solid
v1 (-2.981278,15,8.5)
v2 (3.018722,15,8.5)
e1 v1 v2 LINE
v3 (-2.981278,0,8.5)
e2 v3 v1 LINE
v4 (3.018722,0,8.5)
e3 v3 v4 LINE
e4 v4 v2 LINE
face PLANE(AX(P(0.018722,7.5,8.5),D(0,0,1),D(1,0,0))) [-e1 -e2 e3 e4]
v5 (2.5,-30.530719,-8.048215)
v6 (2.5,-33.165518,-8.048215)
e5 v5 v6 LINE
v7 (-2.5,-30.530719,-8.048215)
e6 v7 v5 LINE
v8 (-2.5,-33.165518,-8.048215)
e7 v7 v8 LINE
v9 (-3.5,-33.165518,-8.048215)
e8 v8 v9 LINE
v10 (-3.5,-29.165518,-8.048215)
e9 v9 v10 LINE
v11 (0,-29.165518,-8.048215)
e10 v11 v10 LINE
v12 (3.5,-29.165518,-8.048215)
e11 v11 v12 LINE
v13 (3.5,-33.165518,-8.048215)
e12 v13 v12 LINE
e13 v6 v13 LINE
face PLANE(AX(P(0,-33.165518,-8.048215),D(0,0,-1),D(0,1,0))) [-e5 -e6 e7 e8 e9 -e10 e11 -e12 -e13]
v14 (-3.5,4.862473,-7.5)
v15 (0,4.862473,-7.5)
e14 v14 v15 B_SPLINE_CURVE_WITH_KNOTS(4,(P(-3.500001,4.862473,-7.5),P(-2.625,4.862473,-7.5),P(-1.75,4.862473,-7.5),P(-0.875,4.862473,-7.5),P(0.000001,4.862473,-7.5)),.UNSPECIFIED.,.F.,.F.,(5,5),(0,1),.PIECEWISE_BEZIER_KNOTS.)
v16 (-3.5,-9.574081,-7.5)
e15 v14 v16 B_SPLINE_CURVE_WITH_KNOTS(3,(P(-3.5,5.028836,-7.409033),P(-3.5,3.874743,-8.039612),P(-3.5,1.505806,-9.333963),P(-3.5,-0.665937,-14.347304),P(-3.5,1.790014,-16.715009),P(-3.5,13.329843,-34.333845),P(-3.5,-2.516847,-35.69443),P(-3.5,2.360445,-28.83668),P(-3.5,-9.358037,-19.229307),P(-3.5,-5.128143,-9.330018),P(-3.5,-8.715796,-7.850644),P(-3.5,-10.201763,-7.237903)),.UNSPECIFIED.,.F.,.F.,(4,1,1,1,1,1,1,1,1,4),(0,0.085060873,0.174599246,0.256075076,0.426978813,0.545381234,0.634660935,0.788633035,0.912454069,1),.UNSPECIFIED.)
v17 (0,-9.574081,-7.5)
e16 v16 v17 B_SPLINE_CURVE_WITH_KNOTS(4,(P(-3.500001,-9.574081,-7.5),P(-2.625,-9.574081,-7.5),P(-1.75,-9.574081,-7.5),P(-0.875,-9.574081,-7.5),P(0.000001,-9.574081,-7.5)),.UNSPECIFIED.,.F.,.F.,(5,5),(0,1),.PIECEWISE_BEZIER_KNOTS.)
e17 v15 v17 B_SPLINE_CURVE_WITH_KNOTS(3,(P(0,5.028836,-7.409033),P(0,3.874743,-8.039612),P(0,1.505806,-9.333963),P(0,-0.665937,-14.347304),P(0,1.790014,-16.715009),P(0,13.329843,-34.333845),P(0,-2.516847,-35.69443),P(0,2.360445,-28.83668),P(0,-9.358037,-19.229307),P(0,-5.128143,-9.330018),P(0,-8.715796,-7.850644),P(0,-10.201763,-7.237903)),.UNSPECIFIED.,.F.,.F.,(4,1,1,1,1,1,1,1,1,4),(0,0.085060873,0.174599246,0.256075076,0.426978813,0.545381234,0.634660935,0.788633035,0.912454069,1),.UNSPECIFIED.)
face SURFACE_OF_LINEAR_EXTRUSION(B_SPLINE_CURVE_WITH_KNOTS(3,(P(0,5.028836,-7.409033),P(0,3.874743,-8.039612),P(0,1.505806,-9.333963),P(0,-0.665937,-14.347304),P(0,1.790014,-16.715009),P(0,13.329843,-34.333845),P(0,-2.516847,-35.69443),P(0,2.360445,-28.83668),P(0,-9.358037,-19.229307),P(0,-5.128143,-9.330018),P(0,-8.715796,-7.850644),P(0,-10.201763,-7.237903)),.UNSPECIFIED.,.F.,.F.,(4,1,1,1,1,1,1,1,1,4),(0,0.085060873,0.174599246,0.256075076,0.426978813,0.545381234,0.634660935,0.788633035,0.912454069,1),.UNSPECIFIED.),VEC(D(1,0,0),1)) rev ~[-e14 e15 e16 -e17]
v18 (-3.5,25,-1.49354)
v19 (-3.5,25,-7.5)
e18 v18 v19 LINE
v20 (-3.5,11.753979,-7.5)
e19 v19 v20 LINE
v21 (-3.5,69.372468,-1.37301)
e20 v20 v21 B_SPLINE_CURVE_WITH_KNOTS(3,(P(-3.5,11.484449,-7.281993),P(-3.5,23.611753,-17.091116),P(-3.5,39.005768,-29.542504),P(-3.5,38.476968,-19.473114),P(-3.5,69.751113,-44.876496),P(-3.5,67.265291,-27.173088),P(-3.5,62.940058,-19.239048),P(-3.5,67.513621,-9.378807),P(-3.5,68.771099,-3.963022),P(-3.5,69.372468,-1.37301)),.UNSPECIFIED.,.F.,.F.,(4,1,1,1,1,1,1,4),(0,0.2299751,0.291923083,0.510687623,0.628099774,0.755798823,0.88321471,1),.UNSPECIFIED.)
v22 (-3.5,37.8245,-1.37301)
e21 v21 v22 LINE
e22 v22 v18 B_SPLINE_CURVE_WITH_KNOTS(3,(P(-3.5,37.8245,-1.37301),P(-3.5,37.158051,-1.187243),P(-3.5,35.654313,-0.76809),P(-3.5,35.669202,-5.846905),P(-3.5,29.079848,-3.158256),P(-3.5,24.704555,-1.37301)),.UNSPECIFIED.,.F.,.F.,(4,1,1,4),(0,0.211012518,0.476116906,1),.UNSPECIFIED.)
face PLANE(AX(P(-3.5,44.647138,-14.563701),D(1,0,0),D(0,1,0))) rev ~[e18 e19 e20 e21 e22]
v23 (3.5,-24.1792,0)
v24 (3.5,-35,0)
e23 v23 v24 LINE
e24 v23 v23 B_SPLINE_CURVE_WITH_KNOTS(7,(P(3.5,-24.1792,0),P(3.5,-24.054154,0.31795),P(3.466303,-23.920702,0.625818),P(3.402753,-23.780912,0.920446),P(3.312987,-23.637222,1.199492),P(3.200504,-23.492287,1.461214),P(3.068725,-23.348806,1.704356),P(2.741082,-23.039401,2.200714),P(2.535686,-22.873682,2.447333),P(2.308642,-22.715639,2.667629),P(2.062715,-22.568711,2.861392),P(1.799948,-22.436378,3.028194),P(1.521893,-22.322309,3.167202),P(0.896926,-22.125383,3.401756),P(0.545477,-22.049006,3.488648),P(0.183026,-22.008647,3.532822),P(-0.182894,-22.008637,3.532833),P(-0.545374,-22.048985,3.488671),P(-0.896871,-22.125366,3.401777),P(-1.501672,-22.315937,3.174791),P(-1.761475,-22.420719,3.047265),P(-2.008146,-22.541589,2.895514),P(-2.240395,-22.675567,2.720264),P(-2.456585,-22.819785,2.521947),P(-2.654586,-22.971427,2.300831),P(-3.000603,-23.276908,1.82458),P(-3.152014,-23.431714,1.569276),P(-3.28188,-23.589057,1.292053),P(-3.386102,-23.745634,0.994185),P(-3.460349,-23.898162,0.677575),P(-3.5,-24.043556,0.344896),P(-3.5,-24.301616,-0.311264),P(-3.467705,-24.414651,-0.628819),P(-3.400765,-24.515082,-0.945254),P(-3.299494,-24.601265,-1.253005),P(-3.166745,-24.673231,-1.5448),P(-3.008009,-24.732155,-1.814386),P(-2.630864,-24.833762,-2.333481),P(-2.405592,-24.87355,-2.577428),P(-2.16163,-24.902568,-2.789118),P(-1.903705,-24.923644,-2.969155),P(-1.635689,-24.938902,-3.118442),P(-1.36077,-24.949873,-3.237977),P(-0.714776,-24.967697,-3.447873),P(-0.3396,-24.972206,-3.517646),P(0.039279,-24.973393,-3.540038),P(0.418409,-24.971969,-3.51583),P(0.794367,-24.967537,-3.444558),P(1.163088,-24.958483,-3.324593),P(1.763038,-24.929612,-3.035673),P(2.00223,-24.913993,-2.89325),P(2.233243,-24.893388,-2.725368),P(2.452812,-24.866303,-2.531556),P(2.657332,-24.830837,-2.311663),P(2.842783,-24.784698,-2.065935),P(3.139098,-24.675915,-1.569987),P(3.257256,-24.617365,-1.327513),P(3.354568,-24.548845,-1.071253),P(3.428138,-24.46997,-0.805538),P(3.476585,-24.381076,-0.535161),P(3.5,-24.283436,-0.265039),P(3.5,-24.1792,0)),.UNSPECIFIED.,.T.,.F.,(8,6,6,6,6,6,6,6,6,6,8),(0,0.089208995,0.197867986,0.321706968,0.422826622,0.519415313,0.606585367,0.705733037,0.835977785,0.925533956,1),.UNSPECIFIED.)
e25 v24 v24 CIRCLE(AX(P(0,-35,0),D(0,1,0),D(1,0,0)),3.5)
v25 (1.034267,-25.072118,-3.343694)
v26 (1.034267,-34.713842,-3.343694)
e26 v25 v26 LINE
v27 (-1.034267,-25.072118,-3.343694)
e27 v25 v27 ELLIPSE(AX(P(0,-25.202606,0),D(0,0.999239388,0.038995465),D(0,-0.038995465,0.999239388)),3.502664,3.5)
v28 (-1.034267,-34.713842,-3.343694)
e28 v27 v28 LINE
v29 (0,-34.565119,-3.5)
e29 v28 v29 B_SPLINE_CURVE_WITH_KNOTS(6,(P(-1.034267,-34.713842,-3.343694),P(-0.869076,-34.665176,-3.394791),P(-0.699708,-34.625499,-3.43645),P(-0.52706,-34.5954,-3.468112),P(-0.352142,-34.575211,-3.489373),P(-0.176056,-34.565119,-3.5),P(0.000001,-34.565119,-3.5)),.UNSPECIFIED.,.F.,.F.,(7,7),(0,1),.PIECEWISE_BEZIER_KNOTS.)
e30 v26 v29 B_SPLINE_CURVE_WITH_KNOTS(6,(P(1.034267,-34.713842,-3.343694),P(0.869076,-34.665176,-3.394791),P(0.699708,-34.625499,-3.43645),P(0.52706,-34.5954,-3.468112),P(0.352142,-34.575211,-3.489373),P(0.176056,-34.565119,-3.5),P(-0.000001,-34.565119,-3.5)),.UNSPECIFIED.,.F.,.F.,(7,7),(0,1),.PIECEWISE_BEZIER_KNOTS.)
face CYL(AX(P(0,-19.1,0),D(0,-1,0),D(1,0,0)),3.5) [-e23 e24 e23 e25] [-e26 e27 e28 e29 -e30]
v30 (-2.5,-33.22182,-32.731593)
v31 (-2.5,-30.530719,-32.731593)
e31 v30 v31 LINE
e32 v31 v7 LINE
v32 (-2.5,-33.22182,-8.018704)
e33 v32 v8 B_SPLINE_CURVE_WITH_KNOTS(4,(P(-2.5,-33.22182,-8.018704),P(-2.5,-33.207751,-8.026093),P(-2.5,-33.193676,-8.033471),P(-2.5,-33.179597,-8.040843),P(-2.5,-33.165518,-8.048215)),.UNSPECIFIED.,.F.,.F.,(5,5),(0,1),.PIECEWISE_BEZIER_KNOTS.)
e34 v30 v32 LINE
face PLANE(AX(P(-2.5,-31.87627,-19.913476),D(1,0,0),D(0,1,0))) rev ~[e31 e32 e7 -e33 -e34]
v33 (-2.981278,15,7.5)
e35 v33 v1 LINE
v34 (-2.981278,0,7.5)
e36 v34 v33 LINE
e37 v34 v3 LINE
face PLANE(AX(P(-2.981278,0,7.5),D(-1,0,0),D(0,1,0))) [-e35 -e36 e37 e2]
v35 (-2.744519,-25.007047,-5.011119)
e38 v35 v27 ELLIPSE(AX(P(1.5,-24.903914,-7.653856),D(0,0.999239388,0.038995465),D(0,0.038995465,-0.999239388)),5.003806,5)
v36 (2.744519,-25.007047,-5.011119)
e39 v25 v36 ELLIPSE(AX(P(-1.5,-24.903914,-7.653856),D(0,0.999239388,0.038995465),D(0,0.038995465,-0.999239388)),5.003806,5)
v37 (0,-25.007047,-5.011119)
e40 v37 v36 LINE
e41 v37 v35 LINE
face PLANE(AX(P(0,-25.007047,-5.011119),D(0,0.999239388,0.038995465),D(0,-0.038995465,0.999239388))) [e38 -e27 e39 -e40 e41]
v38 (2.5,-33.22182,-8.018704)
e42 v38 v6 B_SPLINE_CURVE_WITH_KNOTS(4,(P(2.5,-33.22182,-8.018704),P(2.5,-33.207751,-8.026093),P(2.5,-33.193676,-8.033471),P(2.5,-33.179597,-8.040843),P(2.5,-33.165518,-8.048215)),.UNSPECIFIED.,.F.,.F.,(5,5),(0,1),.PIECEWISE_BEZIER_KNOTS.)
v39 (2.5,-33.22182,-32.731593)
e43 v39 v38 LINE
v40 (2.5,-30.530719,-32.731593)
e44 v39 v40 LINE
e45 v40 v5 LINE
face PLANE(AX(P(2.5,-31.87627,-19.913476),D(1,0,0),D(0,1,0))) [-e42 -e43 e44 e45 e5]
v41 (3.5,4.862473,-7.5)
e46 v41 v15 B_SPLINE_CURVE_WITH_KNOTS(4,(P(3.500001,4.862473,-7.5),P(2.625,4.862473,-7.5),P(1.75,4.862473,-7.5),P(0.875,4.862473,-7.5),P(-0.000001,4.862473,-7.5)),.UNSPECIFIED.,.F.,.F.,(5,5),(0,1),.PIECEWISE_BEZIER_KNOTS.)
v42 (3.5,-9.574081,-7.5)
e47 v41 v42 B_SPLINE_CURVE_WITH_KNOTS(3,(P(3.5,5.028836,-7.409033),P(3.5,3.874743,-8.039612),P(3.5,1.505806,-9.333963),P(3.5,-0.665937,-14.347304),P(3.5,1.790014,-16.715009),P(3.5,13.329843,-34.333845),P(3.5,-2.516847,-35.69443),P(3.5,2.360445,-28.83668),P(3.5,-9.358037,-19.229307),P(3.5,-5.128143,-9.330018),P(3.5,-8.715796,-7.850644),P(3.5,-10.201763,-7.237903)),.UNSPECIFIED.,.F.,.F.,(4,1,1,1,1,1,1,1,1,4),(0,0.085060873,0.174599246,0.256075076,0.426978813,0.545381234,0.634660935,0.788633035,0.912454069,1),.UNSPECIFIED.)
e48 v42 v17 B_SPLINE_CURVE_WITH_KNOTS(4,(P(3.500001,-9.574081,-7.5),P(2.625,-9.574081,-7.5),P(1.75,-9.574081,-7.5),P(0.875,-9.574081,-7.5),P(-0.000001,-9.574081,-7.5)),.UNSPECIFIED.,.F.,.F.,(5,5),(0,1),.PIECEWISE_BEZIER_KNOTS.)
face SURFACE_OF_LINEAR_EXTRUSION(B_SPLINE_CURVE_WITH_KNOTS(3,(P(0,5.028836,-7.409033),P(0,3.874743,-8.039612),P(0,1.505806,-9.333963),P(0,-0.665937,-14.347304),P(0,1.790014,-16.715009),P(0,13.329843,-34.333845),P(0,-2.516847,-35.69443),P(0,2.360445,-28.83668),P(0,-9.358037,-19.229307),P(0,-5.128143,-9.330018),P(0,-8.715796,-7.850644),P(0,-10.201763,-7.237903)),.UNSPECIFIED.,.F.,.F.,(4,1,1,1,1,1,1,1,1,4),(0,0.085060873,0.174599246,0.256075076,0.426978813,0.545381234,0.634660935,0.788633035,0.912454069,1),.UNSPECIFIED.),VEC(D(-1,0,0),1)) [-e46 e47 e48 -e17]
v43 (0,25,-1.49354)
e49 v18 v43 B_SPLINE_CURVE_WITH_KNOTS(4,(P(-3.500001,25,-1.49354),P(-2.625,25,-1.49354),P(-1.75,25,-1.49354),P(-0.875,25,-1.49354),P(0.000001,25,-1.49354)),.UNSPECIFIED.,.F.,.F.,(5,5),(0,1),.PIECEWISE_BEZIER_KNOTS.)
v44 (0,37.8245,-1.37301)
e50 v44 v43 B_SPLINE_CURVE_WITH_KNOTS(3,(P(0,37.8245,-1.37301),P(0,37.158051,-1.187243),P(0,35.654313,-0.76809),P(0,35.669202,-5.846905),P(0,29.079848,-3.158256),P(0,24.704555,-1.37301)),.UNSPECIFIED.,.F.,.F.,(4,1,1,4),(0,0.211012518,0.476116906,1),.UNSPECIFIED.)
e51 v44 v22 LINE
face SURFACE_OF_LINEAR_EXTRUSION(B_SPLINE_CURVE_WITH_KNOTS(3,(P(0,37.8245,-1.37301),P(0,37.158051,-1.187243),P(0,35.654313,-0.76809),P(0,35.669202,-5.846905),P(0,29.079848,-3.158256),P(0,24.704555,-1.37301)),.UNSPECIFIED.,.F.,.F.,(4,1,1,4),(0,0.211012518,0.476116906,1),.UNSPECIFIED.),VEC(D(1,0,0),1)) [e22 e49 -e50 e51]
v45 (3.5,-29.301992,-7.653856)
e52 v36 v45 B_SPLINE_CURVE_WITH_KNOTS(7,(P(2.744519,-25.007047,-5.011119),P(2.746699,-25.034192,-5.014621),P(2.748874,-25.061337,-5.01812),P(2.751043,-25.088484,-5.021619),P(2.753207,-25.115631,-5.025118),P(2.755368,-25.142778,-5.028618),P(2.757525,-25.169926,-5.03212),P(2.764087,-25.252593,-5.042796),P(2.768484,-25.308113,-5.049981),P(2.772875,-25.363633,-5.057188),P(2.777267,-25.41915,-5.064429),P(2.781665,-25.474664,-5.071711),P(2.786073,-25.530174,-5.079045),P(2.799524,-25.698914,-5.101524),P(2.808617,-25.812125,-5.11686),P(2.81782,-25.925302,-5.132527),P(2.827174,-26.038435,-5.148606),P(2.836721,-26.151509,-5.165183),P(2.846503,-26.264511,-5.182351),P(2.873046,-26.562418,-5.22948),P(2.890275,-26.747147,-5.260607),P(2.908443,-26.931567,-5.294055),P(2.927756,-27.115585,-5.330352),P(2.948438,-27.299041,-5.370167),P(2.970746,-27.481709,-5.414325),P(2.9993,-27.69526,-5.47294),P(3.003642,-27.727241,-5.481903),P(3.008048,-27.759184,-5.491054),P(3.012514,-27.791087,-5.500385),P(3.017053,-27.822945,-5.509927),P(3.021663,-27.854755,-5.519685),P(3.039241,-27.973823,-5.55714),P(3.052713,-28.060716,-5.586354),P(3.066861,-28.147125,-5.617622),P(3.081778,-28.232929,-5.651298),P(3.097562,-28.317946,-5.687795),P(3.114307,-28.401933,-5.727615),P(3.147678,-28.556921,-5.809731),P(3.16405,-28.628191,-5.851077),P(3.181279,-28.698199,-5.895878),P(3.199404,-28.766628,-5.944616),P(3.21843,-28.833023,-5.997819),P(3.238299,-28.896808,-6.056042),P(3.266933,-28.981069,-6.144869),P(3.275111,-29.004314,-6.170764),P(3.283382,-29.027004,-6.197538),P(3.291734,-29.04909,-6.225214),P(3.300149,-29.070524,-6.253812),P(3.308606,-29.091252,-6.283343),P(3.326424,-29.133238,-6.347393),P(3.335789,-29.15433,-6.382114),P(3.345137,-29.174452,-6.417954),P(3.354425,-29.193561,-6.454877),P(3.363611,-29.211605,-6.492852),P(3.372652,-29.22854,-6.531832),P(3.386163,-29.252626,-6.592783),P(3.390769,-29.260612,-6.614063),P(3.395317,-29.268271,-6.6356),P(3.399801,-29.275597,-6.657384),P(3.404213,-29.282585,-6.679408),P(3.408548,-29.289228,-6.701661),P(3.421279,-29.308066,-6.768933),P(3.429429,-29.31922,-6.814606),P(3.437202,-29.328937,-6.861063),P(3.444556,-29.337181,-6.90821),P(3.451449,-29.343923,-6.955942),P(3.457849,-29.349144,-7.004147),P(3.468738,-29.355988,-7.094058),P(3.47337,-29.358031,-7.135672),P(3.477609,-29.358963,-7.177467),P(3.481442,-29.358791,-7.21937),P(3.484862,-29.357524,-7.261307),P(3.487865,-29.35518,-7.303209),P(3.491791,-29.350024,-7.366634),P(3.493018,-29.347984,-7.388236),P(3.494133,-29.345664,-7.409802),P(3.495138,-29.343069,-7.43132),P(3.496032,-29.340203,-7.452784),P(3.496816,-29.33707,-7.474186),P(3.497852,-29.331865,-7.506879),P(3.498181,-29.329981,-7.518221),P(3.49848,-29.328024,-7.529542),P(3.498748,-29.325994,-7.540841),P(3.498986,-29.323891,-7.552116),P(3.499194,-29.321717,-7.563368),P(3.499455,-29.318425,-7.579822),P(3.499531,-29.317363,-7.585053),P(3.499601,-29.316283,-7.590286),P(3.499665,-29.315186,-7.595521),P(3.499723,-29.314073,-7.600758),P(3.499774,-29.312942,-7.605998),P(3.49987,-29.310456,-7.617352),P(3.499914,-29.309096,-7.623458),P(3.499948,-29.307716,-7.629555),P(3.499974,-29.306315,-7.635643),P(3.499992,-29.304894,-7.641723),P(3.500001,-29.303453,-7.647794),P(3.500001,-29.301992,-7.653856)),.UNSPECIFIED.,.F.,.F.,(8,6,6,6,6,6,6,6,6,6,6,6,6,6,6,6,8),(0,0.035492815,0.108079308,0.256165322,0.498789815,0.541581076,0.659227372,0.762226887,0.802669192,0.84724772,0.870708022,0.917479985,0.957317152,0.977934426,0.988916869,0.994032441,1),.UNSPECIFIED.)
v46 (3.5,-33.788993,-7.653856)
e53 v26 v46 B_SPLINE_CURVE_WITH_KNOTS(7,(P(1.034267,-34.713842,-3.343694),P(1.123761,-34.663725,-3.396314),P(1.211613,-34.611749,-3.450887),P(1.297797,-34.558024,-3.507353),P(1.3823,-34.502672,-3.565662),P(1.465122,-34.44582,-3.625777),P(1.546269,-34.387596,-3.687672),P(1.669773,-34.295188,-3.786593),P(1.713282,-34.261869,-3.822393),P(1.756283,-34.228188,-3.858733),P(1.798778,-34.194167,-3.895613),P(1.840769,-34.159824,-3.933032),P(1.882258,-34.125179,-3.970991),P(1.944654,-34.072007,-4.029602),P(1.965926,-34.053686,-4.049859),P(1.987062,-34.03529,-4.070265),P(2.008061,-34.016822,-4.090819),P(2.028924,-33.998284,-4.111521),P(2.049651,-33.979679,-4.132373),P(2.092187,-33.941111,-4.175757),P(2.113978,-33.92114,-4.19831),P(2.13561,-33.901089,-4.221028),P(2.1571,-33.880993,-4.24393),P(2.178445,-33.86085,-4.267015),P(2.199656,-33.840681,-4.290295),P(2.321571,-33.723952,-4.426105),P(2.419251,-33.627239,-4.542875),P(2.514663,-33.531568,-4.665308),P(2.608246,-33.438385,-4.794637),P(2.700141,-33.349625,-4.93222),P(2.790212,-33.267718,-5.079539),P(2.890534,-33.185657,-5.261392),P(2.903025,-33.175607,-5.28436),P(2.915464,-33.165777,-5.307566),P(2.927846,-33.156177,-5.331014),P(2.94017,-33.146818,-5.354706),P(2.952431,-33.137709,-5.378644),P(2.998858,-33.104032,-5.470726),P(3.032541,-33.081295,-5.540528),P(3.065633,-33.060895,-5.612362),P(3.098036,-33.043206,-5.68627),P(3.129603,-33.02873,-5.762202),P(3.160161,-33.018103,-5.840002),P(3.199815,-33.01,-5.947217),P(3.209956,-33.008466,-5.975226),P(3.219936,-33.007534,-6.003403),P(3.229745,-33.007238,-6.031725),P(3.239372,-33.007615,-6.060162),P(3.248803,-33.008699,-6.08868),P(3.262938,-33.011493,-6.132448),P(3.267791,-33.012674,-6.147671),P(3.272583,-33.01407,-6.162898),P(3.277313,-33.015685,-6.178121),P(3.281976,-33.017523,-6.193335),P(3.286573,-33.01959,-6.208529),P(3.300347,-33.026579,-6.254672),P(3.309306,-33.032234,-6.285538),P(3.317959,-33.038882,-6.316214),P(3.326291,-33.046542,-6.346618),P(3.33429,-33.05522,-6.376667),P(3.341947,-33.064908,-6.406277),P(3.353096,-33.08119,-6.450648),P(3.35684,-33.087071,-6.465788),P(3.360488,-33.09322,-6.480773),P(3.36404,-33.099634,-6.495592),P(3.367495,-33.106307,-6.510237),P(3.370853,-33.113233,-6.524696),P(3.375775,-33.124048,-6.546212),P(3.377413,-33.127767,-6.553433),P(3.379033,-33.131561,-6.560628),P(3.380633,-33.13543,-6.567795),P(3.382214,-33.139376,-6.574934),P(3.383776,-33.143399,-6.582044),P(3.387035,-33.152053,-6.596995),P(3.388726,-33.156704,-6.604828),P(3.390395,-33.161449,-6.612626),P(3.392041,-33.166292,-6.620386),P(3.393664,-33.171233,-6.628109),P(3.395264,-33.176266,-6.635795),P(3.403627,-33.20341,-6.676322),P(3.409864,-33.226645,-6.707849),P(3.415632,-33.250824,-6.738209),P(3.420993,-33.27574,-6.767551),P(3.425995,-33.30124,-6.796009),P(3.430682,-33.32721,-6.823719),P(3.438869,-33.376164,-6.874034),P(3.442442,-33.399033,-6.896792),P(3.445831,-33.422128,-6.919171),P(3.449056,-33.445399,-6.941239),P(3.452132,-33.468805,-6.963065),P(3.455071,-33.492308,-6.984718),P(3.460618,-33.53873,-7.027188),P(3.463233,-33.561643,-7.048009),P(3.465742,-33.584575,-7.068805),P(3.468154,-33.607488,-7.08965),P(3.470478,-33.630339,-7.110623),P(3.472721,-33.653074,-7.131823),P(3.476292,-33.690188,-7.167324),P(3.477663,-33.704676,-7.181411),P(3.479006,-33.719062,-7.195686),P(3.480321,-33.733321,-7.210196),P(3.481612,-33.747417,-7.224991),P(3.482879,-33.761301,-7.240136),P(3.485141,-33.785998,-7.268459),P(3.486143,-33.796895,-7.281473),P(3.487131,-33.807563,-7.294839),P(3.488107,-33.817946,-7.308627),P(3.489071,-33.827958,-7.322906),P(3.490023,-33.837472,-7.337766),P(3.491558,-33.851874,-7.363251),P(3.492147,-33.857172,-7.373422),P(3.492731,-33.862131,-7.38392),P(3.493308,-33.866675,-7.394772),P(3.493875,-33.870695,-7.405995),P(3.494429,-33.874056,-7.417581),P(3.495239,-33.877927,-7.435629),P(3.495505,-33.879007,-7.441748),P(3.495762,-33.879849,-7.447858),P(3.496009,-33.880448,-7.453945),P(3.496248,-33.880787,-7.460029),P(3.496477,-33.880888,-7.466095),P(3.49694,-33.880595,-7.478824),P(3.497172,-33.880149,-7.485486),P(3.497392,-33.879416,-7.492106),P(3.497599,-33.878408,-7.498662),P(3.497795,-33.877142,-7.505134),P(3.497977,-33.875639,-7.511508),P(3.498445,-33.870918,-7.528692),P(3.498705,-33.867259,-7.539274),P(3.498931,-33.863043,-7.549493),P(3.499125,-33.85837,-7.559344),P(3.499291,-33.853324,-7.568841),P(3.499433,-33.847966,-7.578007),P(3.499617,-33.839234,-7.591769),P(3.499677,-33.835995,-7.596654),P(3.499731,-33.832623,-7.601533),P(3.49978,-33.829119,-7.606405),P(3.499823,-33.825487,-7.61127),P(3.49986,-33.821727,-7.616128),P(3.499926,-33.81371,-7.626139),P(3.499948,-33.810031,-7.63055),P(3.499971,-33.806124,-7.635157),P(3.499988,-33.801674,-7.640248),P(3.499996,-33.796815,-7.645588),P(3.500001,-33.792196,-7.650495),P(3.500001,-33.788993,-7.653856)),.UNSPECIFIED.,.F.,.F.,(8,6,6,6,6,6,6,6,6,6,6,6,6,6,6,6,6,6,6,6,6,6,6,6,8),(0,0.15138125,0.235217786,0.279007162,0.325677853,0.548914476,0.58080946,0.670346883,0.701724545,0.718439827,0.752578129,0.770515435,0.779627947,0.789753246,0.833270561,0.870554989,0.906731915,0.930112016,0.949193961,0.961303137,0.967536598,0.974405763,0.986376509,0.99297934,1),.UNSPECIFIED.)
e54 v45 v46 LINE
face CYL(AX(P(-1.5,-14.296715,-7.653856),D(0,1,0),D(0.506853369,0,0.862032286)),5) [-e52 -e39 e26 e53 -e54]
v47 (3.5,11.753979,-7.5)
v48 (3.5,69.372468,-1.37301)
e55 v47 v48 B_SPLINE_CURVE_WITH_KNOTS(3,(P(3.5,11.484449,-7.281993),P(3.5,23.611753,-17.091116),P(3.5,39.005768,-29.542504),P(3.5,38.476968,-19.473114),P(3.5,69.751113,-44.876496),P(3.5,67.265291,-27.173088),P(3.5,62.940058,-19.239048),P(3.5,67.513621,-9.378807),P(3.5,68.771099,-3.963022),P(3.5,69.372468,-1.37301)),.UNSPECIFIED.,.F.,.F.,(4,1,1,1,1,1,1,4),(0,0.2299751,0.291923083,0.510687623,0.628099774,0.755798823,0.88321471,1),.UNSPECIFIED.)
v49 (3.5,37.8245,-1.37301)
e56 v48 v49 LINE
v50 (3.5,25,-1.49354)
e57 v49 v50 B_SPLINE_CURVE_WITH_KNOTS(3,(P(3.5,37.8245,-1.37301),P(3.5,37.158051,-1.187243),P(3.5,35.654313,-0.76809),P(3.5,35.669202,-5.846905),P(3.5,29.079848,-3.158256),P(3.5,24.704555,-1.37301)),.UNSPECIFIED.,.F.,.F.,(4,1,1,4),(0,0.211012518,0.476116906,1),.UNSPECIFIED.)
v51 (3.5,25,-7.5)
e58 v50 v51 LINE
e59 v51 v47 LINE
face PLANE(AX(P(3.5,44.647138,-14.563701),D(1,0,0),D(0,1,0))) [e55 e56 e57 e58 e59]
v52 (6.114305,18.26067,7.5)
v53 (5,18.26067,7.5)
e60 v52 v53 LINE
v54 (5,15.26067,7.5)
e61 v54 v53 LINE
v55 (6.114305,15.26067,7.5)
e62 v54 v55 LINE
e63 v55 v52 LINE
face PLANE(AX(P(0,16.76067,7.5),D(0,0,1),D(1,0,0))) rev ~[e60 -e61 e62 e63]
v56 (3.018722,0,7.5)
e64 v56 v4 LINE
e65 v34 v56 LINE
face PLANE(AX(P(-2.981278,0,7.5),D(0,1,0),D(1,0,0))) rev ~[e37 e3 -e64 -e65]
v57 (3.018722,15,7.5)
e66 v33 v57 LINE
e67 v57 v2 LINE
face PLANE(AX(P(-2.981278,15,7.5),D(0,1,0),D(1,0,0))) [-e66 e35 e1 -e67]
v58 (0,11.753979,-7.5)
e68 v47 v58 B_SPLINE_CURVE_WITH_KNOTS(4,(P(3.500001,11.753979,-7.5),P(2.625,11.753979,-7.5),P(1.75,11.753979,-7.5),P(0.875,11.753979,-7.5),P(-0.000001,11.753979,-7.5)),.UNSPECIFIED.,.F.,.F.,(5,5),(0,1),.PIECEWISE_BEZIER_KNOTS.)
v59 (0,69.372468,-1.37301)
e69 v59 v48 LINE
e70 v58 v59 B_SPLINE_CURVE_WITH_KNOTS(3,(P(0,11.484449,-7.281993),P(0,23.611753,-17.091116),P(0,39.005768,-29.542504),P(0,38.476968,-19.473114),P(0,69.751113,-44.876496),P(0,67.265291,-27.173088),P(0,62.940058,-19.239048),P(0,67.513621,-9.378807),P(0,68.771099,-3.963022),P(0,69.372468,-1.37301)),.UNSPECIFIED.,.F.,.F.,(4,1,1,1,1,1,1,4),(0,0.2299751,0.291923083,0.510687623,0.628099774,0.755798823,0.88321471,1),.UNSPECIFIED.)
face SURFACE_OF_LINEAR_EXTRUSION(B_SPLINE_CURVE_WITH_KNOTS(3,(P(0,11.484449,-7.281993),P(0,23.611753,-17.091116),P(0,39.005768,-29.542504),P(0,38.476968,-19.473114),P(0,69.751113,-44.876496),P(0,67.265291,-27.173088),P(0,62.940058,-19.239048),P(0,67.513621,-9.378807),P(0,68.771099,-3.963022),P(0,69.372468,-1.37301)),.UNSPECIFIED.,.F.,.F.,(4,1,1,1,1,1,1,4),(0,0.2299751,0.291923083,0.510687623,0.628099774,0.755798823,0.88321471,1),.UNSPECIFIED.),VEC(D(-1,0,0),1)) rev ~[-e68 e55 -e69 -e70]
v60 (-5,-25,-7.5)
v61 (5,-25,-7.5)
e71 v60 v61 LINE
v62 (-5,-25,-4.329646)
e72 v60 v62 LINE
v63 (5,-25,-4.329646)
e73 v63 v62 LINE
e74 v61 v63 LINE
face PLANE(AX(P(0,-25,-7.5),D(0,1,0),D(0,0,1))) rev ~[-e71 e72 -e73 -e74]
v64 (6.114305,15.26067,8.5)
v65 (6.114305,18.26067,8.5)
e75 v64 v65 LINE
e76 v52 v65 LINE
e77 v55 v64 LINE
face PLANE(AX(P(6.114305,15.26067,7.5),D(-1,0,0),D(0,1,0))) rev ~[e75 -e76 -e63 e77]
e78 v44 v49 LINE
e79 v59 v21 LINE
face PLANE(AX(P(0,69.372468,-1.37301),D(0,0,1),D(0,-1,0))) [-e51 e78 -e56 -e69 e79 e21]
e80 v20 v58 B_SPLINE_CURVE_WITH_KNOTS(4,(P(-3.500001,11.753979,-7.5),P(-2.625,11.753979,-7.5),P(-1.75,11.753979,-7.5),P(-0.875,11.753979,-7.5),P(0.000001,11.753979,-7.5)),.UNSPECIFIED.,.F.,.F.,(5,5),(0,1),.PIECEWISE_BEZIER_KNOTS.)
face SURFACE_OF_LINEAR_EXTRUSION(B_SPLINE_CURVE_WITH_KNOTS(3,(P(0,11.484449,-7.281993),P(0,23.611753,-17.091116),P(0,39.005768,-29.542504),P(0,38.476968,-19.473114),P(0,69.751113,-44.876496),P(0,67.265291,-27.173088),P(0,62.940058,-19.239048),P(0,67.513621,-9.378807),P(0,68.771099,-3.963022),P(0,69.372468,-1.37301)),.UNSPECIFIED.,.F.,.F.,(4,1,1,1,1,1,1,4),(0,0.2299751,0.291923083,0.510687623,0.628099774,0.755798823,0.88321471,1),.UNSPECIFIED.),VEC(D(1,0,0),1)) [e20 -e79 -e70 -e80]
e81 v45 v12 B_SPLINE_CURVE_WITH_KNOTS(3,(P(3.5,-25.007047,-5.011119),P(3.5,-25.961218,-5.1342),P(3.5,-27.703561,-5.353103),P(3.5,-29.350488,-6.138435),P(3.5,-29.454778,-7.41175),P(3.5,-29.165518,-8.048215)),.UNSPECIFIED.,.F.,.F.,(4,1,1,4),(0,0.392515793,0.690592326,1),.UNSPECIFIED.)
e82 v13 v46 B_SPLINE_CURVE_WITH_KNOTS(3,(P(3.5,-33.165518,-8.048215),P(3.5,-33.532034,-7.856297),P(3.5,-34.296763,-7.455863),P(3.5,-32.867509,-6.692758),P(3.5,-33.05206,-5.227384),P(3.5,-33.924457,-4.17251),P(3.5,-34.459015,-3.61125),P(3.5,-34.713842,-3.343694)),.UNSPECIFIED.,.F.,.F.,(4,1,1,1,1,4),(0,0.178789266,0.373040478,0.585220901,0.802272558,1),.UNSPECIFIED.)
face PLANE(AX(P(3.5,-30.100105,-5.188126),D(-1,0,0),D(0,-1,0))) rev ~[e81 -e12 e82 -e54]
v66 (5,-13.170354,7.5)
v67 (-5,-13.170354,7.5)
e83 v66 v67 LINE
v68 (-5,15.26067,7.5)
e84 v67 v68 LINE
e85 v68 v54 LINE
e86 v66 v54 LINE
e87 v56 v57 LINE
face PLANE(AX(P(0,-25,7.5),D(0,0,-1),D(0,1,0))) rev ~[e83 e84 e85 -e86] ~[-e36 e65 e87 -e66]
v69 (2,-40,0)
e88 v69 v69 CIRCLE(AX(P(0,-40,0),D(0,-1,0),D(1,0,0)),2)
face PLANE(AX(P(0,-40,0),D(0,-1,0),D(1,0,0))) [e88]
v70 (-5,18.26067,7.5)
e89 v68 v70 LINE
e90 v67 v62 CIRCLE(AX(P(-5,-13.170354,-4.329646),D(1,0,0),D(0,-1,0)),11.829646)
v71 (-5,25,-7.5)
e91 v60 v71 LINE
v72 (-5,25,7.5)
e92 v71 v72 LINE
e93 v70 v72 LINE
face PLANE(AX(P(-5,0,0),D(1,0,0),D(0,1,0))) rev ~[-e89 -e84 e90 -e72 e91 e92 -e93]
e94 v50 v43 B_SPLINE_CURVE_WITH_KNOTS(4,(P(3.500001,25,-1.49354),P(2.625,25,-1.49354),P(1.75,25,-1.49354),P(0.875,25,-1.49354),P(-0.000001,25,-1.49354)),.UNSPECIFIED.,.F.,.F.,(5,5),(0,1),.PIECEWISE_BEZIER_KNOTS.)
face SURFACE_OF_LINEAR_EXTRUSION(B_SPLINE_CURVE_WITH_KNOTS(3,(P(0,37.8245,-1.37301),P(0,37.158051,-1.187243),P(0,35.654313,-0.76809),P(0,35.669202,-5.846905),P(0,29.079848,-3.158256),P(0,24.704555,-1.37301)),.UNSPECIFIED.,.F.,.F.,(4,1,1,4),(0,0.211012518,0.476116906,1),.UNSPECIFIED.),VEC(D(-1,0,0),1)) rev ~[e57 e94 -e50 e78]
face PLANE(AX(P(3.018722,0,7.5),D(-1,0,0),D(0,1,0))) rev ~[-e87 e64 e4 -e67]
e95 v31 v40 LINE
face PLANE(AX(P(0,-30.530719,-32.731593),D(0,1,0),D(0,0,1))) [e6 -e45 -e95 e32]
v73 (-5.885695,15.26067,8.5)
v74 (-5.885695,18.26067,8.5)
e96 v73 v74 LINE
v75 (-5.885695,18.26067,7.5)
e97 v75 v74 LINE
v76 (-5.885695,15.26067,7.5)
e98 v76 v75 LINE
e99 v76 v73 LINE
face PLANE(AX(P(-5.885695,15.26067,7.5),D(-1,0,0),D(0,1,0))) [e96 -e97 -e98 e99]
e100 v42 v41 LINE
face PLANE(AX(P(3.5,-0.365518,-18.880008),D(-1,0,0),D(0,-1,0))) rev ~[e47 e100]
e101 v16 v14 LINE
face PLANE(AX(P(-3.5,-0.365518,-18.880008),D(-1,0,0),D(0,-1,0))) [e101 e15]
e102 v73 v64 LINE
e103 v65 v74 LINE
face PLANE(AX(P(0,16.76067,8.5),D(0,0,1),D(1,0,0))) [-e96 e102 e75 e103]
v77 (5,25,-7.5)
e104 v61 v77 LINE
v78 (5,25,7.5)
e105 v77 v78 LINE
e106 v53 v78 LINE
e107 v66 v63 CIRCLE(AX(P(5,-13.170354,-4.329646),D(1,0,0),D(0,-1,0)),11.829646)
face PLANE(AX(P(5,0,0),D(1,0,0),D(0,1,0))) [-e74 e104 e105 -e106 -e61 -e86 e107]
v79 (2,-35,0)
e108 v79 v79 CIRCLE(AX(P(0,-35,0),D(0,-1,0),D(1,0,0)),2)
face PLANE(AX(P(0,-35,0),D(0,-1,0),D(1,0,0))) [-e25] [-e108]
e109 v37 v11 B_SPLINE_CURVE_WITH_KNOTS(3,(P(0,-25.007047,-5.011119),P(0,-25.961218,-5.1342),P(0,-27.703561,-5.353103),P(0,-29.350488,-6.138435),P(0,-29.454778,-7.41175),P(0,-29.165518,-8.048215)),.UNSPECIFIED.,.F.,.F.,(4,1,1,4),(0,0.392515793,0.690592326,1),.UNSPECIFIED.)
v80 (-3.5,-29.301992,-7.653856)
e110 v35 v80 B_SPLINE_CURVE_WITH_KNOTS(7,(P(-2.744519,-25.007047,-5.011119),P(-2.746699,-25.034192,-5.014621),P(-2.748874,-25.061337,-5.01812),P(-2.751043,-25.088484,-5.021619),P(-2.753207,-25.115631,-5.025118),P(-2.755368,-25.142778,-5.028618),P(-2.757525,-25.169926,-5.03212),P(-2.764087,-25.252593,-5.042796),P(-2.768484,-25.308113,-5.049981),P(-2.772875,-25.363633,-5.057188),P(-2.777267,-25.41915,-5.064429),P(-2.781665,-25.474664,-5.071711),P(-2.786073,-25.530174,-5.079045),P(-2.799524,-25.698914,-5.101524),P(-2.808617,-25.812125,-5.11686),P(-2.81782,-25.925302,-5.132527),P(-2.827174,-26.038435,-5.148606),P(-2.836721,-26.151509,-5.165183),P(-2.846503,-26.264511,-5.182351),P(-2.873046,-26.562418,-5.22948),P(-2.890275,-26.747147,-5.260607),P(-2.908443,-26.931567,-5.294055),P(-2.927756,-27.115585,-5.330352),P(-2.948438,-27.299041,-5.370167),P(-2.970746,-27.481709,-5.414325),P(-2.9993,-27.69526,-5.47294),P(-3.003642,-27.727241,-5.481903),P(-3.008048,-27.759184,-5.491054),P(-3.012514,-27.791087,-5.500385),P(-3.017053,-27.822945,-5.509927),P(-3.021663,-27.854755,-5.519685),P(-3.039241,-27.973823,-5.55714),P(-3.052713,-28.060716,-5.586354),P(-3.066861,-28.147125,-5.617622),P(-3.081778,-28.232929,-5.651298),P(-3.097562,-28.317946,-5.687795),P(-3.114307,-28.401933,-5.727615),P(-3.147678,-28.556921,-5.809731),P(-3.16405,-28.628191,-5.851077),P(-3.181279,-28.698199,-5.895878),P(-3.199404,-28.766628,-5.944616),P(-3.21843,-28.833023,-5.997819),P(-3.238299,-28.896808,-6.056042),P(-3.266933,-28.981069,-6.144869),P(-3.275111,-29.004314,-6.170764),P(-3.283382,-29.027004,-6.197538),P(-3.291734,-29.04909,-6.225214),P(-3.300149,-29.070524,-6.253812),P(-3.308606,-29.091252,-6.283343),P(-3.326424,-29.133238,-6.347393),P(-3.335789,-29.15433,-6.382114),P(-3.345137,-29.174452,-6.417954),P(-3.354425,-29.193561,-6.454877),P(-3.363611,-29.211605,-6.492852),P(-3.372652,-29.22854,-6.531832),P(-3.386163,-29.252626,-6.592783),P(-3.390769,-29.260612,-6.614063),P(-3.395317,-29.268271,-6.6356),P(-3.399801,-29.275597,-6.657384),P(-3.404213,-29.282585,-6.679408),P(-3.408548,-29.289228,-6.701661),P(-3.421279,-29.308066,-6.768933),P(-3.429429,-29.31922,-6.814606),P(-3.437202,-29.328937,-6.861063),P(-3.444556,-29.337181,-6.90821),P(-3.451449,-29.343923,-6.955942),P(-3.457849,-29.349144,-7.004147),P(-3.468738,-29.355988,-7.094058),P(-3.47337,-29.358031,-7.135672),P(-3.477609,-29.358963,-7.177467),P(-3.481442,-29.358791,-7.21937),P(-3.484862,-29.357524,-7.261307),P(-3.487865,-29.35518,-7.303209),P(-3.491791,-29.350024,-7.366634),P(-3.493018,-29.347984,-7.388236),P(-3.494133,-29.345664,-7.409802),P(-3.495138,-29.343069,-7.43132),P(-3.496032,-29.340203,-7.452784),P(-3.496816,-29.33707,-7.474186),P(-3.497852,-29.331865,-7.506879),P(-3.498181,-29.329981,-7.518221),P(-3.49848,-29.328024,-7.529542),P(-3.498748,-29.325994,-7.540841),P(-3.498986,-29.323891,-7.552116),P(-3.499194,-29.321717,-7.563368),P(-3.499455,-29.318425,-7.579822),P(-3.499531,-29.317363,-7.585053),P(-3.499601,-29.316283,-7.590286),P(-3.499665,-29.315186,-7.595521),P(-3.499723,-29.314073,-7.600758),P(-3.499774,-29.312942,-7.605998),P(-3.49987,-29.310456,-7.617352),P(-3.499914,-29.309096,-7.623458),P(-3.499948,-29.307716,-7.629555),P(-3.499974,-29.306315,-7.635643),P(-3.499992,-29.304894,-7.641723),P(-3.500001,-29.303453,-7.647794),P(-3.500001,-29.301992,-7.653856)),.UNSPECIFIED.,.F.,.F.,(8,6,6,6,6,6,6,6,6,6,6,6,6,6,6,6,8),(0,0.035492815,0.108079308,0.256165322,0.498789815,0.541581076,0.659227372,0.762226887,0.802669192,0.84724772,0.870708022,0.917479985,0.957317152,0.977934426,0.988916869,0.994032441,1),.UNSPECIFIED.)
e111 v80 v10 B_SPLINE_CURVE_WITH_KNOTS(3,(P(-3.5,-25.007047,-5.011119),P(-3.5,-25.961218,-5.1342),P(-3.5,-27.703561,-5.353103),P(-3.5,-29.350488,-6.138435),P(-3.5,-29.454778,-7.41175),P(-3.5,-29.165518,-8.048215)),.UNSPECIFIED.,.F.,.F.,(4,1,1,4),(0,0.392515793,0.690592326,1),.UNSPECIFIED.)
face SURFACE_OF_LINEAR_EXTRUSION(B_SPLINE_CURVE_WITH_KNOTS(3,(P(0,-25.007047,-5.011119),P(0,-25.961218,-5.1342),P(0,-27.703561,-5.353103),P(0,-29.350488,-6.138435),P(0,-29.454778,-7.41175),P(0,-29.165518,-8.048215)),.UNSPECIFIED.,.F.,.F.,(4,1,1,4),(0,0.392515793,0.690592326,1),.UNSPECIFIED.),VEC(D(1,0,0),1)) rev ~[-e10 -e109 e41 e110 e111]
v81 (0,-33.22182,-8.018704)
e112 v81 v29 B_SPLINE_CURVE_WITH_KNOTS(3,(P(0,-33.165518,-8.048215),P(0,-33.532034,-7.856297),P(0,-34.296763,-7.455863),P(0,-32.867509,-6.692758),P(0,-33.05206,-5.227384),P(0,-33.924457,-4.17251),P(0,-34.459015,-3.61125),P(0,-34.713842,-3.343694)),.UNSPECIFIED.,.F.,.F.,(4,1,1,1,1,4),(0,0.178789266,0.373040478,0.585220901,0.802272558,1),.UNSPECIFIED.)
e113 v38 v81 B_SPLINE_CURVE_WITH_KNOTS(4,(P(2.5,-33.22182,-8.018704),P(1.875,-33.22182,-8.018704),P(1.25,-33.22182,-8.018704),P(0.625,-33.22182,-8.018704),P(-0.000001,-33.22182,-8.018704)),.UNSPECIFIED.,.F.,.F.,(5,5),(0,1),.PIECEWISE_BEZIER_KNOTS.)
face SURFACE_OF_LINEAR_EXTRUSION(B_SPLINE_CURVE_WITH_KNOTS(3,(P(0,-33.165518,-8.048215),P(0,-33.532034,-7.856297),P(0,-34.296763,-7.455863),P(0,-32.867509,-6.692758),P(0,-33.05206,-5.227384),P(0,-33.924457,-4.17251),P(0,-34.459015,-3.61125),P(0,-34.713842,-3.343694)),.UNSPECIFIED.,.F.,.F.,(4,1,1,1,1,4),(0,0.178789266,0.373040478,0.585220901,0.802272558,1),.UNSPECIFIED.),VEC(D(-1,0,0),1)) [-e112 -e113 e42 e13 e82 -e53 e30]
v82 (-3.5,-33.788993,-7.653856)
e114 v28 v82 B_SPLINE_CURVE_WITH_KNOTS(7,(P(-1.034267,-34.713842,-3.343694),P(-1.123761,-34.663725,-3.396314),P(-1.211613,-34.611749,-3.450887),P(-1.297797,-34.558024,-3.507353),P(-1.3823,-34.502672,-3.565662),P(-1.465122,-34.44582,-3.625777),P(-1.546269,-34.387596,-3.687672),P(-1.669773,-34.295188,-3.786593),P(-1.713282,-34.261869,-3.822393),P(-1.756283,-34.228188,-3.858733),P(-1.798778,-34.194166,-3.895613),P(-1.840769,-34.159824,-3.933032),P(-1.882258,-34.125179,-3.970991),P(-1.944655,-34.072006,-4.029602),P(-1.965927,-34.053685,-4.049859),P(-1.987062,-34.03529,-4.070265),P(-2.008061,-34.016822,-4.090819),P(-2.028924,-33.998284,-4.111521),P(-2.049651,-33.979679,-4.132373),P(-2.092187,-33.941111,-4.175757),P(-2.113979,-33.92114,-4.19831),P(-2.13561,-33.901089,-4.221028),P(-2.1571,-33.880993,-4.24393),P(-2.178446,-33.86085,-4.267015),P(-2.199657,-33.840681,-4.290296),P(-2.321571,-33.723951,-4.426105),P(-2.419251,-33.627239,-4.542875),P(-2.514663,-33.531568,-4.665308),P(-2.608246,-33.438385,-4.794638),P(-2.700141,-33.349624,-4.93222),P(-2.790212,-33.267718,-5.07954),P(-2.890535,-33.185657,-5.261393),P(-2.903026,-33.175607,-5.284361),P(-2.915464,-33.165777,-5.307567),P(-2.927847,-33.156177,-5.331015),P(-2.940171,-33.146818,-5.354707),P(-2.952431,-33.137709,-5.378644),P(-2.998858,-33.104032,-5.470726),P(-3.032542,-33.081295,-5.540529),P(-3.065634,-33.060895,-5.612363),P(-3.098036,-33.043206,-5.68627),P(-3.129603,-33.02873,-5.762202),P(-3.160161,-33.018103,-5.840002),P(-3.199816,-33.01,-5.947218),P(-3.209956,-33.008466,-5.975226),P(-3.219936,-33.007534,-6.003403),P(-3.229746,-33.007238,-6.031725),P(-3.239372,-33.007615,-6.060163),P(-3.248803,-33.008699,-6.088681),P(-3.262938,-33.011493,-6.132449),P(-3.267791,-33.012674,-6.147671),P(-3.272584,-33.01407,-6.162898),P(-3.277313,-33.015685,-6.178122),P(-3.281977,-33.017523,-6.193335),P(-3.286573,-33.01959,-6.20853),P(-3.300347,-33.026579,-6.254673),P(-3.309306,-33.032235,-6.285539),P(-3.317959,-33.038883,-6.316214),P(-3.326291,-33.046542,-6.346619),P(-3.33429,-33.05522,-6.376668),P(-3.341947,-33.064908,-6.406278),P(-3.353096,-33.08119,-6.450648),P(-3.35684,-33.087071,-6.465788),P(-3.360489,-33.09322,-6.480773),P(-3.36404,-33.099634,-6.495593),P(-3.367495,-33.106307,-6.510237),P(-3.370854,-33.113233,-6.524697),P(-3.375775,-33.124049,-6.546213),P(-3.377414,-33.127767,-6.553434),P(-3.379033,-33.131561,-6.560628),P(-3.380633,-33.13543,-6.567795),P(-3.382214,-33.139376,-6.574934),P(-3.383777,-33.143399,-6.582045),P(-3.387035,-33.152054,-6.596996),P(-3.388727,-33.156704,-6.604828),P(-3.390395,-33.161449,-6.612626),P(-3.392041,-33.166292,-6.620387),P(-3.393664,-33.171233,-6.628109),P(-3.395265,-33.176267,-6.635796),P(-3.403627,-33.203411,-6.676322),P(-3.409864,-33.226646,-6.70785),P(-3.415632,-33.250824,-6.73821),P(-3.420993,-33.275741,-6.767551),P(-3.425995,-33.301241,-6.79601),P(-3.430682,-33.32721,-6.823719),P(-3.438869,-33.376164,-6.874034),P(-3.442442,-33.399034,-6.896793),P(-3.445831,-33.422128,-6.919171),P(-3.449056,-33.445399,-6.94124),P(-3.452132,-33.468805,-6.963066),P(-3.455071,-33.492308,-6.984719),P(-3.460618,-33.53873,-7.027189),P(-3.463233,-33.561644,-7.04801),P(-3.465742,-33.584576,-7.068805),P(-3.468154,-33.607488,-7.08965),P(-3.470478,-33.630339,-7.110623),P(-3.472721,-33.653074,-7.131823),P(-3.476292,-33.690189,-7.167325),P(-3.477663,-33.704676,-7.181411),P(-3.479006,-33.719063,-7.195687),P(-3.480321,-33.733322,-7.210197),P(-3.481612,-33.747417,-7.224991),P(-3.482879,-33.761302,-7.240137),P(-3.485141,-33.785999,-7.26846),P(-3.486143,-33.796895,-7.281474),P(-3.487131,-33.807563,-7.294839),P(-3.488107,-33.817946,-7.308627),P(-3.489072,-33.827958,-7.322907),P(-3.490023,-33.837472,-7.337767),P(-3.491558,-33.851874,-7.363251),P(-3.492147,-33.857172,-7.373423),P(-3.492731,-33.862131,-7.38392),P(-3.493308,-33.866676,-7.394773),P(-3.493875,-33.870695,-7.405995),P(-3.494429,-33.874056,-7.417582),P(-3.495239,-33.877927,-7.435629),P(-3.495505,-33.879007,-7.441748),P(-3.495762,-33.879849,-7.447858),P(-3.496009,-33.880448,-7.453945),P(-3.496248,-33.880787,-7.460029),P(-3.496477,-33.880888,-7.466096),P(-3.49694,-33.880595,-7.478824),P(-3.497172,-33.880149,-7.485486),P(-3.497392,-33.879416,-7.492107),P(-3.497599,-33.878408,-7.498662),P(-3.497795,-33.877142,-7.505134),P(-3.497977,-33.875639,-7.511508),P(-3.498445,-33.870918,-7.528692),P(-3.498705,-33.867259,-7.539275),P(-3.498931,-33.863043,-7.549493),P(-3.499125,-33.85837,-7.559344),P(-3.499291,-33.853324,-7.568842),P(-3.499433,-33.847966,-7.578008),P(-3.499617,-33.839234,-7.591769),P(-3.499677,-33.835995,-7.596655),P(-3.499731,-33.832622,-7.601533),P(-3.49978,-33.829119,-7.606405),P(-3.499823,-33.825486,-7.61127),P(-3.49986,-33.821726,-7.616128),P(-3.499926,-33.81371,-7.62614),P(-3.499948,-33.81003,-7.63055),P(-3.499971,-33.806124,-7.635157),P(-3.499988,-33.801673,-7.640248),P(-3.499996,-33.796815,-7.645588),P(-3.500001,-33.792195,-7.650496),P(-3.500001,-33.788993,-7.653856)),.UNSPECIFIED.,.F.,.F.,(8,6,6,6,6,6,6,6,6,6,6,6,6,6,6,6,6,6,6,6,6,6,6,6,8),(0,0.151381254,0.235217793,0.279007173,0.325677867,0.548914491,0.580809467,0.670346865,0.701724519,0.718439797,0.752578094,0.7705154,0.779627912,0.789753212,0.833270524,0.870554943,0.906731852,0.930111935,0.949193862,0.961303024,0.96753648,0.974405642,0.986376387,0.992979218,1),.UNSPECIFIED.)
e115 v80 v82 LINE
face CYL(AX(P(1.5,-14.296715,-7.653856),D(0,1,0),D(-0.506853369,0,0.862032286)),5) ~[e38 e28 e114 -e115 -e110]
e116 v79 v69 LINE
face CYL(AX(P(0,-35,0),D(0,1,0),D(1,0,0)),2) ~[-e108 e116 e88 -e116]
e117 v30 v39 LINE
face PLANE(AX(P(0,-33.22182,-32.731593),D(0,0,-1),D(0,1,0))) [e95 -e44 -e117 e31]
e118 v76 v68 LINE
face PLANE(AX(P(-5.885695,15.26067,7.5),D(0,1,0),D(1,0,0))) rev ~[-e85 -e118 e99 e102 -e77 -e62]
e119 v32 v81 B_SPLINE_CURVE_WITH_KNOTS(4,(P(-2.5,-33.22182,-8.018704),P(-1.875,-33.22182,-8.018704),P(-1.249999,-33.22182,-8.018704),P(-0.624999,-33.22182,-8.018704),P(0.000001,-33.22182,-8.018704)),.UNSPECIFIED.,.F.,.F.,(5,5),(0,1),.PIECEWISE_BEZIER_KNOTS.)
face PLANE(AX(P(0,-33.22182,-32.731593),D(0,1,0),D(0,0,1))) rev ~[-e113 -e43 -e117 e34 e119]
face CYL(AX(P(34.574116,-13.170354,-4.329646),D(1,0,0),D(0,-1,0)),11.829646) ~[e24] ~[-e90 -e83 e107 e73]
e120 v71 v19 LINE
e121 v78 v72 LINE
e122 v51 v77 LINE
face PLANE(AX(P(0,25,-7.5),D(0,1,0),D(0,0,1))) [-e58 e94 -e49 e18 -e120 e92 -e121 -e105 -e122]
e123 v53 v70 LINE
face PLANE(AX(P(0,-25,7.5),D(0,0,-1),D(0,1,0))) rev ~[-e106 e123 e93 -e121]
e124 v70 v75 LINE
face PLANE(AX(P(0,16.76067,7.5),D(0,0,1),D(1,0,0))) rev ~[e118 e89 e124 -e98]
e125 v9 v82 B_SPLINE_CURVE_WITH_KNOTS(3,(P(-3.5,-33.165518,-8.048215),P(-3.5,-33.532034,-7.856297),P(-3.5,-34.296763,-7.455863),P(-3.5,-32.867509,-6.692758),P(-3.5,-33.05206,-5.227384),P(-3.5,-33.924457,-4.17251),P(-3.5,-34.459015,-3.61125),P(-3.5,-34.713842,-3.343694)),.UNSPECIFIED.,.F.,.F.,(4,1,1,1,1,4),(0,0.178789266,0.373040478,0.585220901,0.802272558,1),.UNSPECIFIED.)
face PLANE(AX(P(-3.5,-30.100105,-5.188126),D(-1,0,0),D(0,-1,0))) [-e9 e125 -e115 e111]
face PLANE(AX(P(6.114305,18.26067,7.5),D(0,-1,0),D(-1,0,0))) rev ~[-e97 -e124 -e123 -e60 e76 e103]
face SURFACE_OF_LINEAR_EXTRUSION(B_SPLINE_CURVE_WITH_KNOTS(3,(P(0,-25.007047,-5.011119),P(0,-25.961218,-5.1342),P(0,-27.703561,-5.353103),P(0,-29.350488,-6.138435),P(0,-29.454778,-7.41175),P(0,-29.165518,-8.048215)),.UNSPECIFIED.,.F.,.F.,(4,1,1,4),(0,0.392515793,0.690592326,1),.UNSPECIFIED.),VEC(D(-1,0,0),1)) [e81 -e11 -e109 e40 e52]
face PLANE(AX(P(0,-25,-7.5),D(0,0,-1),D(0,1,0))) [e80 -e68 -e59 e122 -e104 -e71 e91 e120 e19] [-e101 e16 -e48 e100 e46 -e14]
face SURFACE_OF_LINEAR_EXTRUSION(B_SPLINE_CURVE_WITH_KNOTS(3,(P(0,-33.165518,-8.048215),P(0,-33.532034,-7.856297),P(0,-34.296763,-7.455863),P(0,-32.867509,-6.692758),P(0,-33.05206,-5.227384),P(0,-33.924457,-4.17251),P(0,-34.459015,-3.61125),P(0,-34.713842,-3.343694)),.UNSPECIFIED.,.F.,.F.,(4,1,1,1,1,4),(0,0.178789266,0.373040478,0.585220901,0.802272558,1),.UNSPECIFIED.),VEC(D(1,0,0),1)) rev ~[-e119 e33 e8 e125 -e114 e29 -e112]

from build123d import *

# Parameters (mm, degrees)
F0_W         = 50
F0_H         = 15
F4_DEPTH     = 5
F6_DEPTH     = 3.5
F7_DEPTH     = 3.5
F8_R         = 3.5
F9_DEPTH     = 10
F11_DEPTH    = 3.5
F12_T4_DEPTH = 31.1925308579
F12_T9_DEPTH = 31.1925308579
F13_W        = 2.6911012828
F13_H        = 25.6362333894
F14_DEPTH    = 2.5
F16_W        = 10
F16_H        = 3
F16_W_2      = 0.8856946416
F16_W_3      = 1.1143053584
F17_DEPTH    = 1
F15_W        = 6
F15_H        = 15
F18_DEPTH    = 1
F19_R        = 2
F20_DEPTH    = 5
F23_T4_DEPTH = 69.1482322781
F23_S5_R     = 3.5
F23_T6_DEPTH = 37


# Not quite as in the source:
# - a fillet or chamfer that OpenCascade refuses, or shapes differently, is made with other operations: its cross-section is extruded or revolved along the edge and cut away or added
# - the program builds the solid bodies; features that only make, move or delete a surface that nothing else refers to are left out


with BuildPart() as f4:
    # F0 (on Right) → F4 (new body, symmetric)
    with BuildSketch(Plane.YZ):
        Rectangle(F0_W, F0_H)
    extrude(amount=F4_DEPTH, both=True)

    # F1 (on Right) → F6 (join, symmetric)
    with BuildSketch(Plane.YZ):
        with BuildLine():
            add(Edge.make_bspline(
                [(5.0288359635, -7.4090333655), (3.8747425174, -8.0396121547), (1.5058055584, -9.333962629), (-0.6659366061, -14.3473039029), (1.7900139344, -16.7150092177), (13.3298427925, -34.3338449276), (-2.5168468775, -35.6944299553), (2.3604454281, -28.8366802251), (-9.3580369544, -19.2293074855), (-5.1281425989, -9.3300178953), (-8.7157958407, -7.8506437555), (-10.2017633617, -7.2379028425)],
                knots=[0, 0, 0, 0, 0.085060873, 0.1745992463, 0.2560750759, 0.4269788129, 0.5453812336, 0.634660935, 0.7886330355, 0.9124540687, 1, 1, 1, 1], degree=3))
            Line((5.0288359635, -7.4090333655), (-10.2017633617, -7.2379028425))
        make_face()
    extrude(amount=F6_DEPTH, both=True)

    # F3 (on Right) → F7 (join, symmetric)
    with BuildSketch(Plane.YZ):
        with BuildLine():
            Line((24.7045550495, -7.2819935158), (11.484448798, -7.2819930501))
            add(Edge.make_bspline(
                [(11.484448798, -7.2819930501), (23.6117533605, -17.0911157265), (39.0057683758, -29.5425043256), (38.4769679365, -19.4731144784), (69.7511129966, -44.8764958695), (67.2652908622, -27.1730877398), (62.9400583518, -19.2390483674), (67.5136212356, -9.3788074704), (68.7710991059, -3.9630220268), (69.3724676967, -1.3730096398)],
                knots=[0, 0, 0, 0, 0.2299750996, 0.2919230831, 0.5106876233, 0.6280997743, 0.7557988233, 0.8832147102, 1, 1, 1, 1], degree=3))
            Line((69.3724676967, -1.3730096398), (37.8245003521, -1.3730096398))
            add(Edge.make_bspline(
                [(37.8245003521, -1.3730096398), (37.1580512672, -1.187243061), (35.6543126329, -0.7680896887), (35.6692021274, -5.8469046645), (29.0798478957, -3.1582564204), (24.7045550495, -1.3730096398)],
                knots=[0, 0, 0, 0, 0.2110125183, 0.4761169057, 1, 1, 1, 1], degree=3))
            Line((24.7045550495, -1.3730096398), (24.7045550495, -7.2819935158))
        make_face()
    extrude(amount=F7_DEPTH, both=True)

    # F8 (on face) → F9 (join, symmetric)
    with BuildSketch(Plane.XZ.offset(25)):
        Circle(F8_R)
    extrude(amount=F9_DEPTH, both=True)

    # F10 (on Right) → F11 (join, symmetric)
    with BuildSketch(Plane.YZ):
        with BuildLine():
            add(Edge.make_bspline(
                [(-25.0070467591, -5.0111194141), (-25.9612180154, -5.1341997717), (-27.703561445, -5.3531032437), (-29.3504881217, -6.1384351315), (-29.4547779314, -7.411750037), (-29.1655181944, -8.0482149497)],
                knots=[0, 0, 0, 0, 0.3925157934, 0.6905923264, 1, 1, 1, 1], degree=3))
            Line((-25.0070467591, -5.0111194141), (-25.0721182674, -3.3436943777))
            Line((-25.0721182674, -3.3436943777), (-34.7138419747, -3.3436943777))
            add(Edge.make_bspline(
                [(-33.1655181944, -8.0482149497), (-33.5320342546, -7.8562966256), (-34.2967631965, -7.4558626123), (-32.8675088407, -6.6927583961), (-33.0520601488, -5.2273844056), (-33.9244570896, -4.1725097863), (-34.45901522, -3.6112499704), (-34.7138419747, -3.3436943777)],
                knots=[0, 0, 0, 0, 0.1787892659, 0.3730404776, 0.5852209013, 0.8022725582, 1, 1, 1, 1], degree=3))
            Line((-33.1655181944, -8.0482149497), (-29.1655181944, -8.0482149497))
        make_face()
    extrude(amount=F11_DEPTH, both=True)

    # F12: fillet of radius 5 on 2 edges, made by hand


with BuildPart() as f12_tool2:
    # F12_s3 → F12_t4 (new body)
    with BuildSketch(Plane.XZ.offset(14.2967146921)):
        with BuildLine():
            ThreePointArc((1.0342668459, -3.3436943777), (2.8400077321, -5.1710483475), (3.5, -7.6538558078))
            Line((3.5, -7.6538558078), (3.5, -3.3436943777))
            Line((3.5, -3.3436943777), (1.0342668459, -3.3436943777))
        make_face()
    extrude(amount=F12_T4_DEPTH)

    split(bisect_by=Plane.XZ.offset(25), keep=Keep.TOP)


with BuildPart() as f4_1:
    add(f4.part)

    # F12_t1: cut F12_tool2
    add(f12_tool2.part, mode=Mode.SUBTRACT)


with BuildPart() as f12_tool7:
    # F12_s8 → F12_t9 (new body)
    with BuildSketch(Plane.XZ.offset(14.2967146921)):
        with BuildLine():
            ThreePointArc((-1.0342668459, -3.3436943777), (-2.8400077321, -5.1710483475), (-3.5, -7.6538558078))
            Line((-3.5, -7.6538558078), (-3.5, -3.3436943777))
            Line((-3.5, -3.3436943777), (-1.0342668459, -3.3436943777))
        make_face()
    extrude(amount=F12_T9_DEPTH)

    split(bisect_by=Plane.XZ.offset(25), keep=Keep.TOP)


with BuildPart() as f4_2:
    add(f4_1.part)

    # F12_t6: cut F12_tool7
    add(f12_tool7.part, mode=Mode.SUBTRACT)

    # F13 (on Right) → F14 (join, symmetric)
    with BuildSketch(Plane.YZ):
        with Locations((-31.8762697279, -19.9134759605)):
            Rectangle(F13_W, F13_H)
    extrude(amount=F14_DEPTH, both=True)

    # F16 (on face) → F17 (join)
    with BuildSketch(Plane.XY.offset(7.5)):
        with Locations((0, 16.7606703341)):
            Rectangle(F16_W, F16_H)
        with Locations((-5.4428473208, 16.7606703341)):
            Rectangle(F16_W_2, F16_H)
        with Locations((5.5571526792, 16.7606703341)):
            Rectangle(F16_W_3, F16_H)
    extrude(amount=F17_DEPTH)

    # F15 (on face) → F18 (join)
    with BuildSketch(Plane.XY.offset(7.5)):
        with Locations((0.0187216531, 7.5)):
            Rectangle(F15_W, F15_H)
    extrude(amount=F18_DEPTH)

    # F19 (on face) → F20 (join)
    with BuildSketch(Plane.XZ.offset(35)):
        Circle(F19_R)
    extrude(amount=F20_DEPTH)

    # F23: fillet of radius 11.8296464556 on 1 edges, made by hand


with BuildPart() as f23_tool2:
    # F23_s3 → F23_t4 (new body)
    with BuildSketch(Plane.YZ.offset(34.5741161391)):
        with BuildLine():
            ThreePointArc((-25, -4.3296464556), (-21.5351767722, 4.0351767722), (-13.1703535444, 7.5))
            Line((-13.1703535444, 7.5), (-25, 7.5))
            Line((-25, 7.5), (-25, -4.3296464556))
        make_face()
    extrude(amount=-F23_T4_DEPTH)

    # F23_s5 → F23_t6 (cut, symmetric)
    with BuildSketch(Plane.XZ.offset(19.1)):
        Circle(F23_S5_R)
    extrude(amount=F23_T6_DEPTH, both=True, mode=Mode.SUBTRACT)


with BuildPart() as f4_3:
    add(f4_2.part)

    # F23_t1: cut F23_tool2
    add(f23_tool2.part, mode=Mode.SUBTRACT)


solid = f4_3.part
